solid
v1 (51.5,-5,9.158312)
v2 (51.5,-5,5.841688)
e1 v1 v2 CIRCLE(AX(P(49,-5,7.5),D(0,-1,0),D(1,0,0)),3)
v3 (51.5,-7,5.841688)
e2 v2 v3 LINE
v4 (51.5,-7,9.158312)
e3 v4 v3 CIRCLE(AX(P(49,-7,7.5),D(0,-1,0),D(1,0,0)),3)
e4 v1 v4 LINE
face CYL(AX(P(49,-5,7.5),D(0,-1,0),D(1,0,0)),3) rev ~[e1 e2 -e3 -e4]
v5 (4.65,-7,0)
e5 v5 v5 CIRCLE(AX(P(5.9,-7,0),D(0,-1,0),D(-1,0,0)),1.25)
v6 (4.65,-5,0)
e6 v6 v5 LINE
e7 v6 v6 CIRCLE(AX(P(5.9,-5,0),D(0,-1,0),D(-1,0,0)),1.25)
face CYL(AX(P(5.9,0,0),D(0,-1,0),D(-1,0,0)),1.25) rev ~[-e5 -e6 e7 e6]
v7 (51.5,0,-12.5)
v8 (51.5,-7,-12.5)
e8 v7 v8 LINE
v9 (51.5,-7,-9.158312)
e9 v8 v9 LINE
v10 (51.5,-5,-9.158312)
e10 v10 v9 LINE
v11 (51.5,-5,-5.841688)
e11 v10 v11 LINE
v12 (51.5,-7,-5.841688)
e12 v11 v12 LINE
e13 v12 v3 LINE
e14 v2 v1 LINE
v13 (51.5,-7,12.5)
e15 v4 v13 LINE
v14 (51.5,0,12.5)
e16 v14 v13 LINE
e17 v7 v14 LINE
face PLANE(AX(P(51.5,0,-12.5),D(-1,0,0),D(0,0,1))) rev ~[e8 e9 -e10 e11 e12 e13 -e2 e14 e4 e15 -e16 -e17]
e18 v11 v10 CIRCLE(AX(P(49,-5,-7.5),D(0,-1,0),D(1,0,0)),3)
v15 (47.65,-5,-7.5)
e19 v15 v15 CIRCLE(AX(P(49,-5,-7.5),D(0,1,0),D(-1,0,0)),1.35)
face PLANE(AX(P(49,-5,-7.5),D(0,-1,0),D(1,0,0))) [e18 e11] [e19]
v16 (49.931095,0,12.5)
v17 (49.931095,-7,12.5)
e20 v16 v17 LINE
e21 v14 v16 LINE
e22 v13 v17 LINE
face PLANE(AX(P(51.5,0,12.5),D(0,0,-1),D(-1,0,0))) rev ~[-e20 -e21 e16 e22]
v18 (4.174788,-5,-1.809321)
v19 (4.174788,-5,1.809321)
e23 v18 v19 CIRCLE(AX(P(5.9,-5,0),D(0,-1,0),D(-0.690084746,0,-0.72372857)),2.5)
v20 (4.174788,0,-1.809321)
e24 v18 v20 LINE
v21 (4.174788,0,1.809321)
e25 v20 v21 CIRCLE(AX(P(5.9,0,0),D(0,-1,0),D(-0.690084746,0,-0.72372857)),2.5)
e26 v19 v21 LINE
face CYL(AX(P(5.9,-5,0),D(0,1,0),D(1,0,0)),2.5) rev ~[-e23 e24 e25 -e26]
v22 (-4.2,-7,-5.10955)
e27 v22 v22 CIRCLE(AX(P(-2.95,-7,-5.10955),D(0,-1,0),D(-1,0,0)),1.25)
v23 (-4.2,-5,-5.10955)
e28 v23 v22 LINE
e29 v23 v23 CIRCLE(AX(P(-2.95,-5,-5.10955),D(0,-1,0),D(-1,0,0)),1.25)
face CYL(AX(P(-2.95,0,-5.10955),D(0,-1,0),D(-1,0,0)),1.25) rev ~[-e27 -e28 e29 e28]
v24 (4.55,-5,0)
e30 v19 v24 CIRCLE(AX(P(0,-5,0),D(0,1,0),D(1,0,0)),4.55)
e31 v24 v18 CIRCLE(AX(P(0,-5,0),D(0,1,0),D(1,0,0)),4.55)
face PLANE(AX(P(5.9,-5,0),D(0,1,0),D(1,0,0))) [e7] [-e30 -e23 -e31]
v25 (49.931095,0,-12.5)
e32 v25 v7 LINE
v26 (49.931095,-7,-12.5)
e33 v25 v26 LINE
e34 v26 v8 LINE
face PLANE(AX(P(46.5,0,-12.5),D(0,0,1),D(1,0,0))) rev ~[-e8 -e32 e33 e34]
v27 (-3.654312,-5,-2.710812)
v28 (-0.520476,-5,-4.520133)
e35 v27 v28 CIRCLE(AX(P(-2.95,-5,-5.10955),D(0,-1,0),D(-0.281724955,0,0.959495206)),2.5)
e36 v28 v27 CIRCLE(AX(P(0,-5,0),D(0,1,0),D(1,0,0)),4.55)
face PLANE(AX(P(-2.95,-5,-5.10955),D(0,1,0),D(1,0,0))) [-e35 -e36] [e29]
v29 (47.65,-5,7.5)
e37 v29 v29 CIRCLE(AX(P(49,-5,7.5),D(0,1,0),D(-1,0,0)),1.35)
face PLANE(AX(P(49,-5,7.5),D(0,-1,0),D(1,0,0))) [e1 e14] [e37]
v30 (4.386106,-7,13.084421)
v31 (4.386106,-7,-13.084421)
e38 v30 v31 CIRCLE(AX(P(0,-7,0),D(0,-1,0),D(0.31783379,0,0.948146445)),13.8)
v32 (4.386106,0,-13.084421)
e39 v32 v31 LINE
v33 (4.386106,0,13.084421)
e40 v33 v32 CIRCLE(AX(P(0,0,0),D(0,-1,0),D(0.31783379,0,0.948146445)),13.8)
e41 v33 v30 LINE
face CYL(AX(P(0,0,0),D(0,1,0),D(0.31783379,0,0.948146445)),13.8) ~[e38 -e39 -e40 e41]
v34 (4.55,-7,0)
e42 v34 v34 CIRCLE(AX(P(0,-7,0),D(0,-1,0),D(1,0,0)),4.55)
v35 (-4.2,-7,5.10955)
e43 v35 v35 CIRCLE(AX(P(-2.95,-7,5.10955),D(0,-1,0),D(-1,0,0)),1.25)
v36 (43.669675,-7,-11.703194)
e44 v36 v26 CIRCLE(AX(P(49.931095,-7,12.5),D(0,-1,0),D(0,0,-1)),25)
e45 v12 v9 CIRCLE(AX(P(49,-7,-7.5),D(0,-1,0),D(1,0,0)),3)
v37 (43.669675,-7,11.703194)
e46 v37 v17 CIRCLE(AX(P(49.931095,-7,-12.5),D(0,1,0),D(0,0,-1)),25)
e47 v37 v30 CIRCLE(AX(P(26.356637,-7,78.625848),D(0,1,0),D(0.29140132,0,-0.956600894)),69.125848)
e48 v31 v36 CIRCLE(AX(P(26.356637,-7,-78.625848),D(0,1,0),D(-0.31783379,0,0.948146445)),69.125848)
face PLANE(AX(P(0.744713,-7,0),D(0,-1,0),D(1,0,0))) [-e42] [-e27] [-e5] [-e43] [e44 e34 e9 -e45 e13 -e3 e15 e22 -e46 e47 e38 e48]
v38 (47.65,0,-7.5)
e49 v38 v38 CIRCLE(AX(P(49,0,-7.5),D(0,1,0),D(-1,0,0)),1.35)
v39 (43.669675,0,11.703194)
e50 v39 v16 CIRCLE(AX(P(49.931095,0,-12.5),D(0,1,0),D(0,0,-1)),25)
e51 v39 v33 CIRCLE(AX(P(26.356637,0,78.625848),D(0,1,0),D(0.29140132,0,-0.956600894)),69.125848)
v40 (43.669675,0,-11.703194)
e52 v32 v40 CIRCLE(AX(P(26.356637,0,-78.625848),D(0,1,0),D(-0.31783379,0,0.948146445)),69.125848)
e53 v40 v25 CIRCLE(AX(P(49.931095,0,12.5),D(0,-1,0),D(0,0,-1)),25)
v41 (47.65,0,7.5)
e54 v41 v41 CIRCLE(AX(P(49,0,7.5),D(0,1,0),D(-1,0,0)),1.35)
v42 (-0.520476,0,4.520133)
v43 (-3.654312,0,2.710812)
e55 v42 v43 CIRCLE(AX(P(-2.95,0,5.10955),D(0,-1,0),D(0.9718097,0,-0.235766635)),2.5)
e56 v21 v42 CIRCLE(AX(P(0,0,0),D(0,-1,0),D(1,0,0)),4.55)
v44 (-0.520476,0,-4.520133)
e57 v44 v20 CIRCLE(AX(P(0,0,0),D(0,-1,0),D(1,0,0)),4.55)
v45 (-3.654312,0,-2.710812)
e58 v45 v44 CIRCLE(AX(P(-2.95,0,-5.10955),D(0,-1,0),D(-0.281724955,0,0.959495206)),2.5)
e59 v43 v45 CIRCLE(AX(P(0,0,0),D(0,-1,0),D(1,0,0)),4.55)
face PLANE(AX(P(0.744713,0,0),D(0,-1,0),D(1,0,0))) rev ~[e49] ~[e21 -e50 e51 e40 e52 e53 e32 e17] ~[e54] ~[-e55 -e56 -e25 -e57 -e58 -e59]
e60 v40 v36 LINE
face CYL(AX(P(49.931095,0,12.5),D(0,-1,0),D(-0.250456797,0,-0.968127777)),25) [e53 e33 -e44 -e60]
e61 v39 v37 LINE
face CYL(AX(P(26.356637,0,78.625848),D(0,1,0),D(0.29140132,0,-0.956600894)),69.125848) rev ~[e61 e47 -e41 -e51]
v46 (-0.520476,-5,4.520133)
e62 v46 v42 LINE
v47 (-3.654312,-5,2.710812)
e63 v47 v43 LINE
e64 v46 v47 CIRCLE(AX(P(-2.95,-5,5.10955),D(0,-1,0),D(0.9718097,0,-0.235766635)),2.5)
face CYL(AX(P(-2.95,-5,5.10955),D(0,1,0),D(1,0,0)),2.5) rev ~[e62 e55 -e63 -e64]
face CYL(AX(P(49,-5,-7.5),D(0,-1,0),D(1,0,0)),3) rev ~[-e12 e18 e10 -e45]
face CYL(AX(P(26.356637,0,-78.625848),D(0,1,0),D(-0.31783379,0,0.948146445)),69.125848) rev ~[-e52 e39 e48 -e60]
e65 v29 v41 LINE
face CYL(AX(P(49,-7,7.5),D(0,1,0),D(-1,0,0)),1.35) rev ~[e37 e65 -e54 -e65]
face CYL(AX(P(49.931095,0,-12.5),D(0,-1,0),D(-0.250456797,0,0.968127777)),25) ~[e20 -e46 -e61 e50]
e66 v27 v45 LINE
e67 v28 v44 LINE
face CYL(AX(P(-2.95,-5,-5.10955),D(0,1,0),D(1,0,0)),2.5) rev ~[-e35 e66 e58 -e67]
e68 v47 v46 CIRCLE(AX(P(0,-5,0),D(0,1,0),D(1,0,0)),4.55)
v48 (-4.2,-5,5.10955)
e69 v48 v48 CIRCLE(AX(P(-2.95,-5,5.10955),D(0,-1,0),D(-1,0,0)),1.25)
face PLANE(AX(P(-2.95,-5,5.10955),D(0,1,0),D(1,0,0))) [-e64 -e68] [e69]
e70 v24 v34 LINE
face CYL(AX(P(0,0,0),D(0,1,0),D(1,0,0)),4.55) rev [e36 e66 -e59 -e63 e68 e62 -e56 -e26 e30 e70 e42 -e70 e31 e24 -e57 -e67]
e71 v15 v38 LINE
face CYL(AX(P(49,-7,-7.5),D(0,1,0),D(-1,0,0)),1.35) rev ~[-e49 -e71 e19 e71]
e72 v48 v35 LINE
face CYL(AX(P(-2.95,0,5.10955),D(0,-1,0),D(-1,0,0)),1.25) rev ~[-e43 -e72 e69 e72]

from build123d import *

# Parameters (mm, degrees)
F0_R           = 4.55
F1_DEPTH       = 7
F3_D           = 2.5
F3_CBORE_D     = 5
F3_CBORE_DEPTH = 5
F4_D           = 2.7
F4_CBORE_D     = 6
F4_CBORE_DEPTH = 2
F5_R           = 25


with BuildPart() as f1:
    # F0 (on Front) → F1 (new body)
    with BuildSketch(Plane.XZ):
        with BuildLine():
            ThreePointArc((4.3861063064, -13.0844209451), (11.2019700729, -8.0595202392), (13.8, 0))
            ThreePointArc((13.8, 0), (11.2019700729, 8.0595202392), (4.3861063064, 13.0844209451))
            ThreePointArc((4.3861063064, 13.0844209451), (-13.8, 0), (4.3861063064, -13.0844209451))
        make_face()
        Circle(F0_R, mode=Mode.SUBTRACT)
        with BuildLine():
            ThreePointArc((4.3861063064, 13.0844209451), (11.2019700729, 8.0595202392), (13.8, 0))
            ThreePointArc((13.8, 0), (11.2019700729, -8.0595202392), (4.3861063064, -13.0844209451))
            ThreePointArc((4.3861063064, -13.0844209451), (25.3974589974, -9.5066550069), (46.5, -12.5))
            Line((46.5, -12.5), (51.5, -12.5))
            Line((51.5, -12.5), (51.5, 12.5))
            Line((51.5, 12.5), (46.5, 12.5))
            ThreePointArc((46.5, 12.5), (25.3974589974, 9.5066550069), (4.3861063064, 13.0844209451))
        make_face()
    extrude(amount=F1_DEPTH)

    # F3 (through all)
    with Locations(Plane(origin=(0, 0, 0), x_dir=(1, 0, 0), z_dir=(0, 1, 0))):
        with Locations((-2.95, -5.1095498823), (-2.95, 5.1095498823), (5.9, 0)):
            CounterBoreHole(F3_D / 2, F3_CBORE_D / 2, F3_CBORE_DEPTH)

    # F4 (through all)
    with Locations(Plane.XZ.offset(7)):
        with Locations((49, 7.5), (49, -7.5)):
            CounterBoreHole(F4_D / 2, F4_CBORE_D / 2, F4_CBORE_DEPTH)

    # F5
    f5_edges = [f1.edges().sort_by_distance(p)[0] for p in [
        (46.5, -3.5, 12.5),
        (46.5, -3.5, -12.5),
    ]]
    fillet(f5_edges, radius=F5_R)


solid = f1.part
